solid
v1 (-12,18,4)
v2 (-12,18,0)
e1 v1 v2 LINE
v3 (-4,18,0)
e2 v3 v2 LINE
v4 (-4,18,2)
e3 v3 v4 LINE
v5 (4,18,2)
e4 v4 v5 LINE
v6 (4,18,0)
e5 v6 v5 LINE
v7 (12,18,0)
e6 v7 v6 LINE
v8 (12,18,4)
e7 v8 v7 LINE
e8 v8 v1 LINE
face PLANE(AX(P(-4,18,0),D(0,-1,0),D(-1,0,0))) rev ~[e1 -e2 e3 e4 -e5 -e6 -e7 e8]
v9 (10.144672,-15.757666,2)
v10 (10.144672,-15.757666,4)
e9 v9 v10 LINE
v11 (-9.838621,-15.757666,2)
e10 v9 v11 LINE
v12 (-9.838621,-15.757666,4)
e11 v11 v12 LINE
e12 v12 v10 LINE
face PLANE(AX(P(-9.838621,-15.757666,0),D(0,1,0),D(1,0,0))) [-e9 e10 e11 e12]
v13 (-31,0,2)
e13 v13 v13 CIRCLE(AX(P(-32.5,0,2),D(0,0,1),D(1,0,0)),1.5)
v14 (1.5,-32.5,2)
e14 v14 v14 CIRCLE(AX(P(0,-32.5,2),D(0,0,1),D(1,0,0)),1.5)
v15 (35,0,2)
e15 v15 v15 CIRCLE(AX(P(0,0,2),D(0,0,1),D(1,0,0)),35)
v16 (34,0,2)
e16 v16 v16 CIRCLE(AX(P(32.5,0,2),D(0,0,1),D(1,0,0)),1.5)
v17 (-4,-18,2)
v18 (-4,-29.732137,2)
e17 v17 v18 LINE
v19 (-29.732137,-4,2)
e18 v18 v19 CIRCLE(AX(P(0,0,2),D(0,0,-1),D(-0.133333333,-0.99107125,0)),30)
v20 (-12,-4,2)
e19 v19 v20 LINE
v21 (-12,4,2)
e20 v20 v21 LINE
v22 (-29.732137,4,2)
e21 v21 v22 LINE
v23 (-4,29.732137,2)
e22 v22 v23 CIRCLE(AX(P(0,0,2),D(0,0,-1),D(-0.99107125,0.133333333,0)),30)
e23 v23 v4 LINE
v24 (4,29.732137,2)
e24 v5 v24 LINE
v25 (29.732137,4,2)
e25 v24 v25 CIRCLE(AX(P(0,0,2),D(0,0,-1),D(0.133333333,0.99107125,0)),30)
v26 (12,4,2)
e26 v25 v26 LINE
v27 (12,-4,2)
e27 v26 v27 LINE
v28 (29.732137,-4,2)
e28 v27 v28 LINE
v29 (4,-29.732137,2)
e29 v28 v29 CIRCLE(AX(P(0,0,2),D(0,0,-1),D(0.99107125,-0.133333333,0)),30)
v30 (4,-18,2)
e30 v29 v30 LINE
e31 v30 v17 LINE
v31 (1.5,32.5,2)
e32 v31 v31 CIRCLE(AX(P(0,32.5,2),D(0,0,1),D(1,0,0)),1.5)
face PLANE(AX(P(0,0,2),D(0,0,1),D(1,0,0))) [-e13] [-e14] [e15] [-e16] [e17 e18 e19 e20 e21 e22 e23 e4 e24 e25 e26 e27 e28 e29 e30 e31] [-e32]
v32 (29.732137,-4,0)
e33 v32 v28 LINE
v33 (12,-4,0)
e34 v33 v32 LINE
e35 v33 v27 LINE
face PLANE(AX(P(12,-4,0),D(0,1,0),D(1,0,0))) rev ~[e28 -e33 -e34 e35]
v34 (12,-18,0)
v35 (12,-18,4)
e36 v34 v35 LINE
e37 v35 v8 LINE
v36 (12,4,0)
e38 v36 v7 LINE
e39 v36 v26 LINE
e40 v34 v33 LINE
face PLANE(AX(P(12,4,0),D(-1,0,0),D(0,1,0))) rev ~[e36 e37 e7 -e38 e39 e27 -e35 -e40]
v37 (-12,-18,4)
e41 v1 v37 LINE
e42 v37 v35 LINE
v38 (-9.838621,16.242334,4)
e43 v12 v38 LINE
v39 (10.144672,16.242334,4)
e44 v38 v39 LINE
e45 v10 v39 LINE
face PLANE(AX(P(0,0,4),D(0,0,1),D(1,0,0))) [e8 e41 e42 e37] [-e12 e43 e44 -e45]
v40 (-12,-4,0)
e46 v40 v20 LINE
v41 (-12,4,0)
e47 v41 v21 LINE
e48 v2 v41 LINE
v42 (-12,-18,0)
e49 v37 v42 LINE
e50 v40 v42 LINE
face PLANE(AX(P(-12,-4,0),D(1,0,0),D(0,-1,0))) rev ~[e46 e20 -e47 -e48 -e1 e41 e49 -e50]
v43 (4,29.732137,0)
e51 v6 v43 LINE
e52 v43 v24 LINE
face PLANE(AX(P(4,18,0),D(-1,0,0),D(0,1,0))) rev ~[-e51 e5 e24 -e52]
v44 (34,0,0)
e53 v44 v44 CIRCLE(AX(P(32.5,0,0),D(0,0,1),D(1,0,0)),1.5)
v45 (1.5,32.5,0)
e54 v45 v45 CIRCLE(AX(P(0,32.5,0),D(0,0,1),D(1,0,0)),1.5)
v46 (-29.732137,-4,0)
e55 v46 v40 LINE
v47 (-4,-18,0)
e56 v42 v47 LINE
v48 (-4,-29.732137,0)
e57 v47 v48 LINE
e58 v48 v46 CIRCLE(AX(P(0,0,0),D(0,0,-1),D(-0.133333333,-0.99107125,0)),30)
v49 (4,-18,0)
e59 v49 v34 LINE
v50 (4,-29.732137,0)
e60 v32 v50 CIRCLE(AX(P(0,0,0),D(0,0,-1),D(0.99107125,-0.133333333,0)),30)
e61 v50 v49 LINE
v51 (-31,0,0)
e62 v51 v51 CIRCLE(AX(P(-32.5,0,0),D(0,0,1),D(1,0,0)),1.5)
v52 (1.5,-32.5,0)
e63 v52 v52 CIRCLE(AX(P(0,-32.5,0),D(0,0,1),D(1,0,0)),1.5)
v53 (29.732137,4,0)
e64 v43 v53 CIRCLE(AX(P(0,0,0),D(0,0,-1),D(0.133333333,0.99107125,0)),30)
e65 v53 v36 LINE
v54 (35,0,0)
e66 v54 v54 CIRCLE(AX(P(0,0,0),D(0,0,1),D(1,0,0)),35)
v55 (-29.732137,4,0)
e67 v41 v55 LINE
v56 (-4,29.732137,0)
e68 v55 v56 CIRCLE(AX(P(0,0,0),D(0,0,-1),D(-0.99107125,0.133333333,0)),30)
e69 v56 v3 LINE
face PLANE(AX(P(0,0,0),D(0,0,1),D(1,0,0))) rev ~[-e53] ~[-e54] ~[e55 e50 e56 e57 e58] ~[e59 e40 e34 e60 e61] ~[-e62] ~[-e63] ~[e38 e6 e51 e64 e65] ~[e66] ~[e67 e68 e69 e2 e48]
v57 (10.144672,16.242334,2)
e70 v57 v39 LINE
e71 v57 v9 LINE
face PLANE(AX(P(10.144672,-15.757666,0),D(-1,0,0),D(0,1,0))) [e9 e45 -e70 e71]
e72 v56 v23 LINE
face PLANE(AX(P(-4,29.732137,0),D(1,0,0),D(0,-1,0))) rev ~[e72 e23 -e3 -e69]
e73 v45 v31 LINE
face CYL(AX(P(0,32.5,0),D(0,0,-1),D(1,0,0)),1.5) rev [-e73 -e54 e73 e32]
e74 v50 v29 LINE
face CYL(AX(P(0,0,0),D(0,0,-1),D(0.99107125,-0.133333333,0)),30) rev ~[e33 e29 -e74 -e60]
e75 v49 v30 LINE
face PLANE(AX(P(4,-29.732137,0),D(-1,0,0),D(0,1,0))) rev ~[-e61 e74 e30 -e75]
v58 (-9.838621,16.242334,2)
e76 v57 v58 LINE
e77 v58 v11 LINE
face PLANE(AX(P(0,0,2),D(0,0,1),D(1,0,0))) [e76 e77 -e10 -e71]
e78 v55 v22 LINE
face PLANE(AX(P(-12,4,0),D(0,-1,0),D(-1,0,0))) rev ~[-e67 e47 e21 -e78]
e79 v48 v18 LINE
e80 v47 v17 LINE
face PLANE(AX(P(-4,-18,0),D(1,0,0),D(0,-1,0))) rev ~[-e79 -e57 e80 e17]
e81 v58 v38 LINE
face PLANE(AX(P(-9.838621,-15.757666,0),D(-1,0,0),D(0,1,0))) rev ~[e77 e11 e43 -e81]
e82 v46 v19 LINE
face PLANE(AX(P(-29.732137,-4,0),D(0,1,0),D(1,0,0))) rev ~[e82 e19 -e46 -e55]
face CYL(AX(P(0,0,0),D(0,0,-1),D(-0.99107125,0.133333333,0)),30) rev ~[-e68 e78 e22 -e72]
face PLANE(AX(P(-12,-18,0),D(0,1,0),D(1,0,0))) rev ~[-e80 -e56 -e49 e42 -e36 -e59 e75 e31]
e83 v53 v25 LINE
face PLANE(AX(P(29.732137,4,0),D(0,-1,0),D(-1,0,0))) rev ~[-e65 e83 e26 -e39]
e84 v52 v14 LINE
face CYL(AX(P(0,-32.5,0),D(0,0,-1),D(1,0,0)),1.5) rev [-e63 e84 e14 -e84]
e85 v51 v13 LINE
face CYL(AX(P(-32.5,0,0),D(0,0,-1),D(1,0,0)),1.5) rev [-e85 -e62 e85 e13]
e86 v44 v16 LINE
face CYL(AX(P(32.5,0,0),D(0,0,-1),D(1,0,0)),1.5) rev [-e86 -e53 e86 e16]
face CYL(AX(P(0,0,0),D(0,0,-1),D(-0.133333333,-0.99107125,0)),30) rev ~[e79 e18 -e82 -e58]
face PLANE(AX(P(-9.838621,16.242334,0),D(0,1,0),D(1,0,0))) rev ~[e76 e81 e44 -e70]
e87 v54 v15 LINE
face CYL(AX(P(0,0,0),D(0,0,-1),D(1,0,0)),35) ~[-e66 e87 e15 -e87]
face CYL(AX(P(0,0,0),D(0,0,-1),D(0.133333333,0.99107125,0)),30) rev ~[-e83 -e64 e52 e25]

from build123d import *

# Parameters (mm, degrees)
F0_R     = 35
F0_R_2   = 1.5
F0_W     = 19.983293198
F0_H     = 32
F1_DEPTH = 2
F2_DEPTH = 4


# Not quite as in the source:
# - a feature names something its author has since deleted; it is built from what else it names


with BuildPart() as f1:
    # F0 (on Top) → F1 (new body)
    with BuildSketch(Plane.XY):
        Circle(F0_R)
        with Locations((0, -32.5)):
            Circle(F0_R_2, mode=Mode.SUBTRACT)
        with Locations((-32.5, 0)):
            Circle(F0_R_2, mode=Mode.SUBTRACT)
        with BuildLine():
            ThreePointArc((29.7321374946, 4), (29.9329594664, 2.0044793789), (30, 0))
            ThreePointArc((30, 0), (29.9329594664, -2.0044793789), (29.7321374946, -4))
            ThreePointArc((29.7321374946, -4), (21.2132034356, -21.2132034356), (4, -29.7321374946))
            ThreePointArc((4, -29.7321374946), (0, -30), (-4, -29.7321374946))
            ThreePointArc((-4, -29.7321374946), (-21.2132034356, -21.2132034356), (-29.7321374946, -4))
            ThreePointArc((-29.7321374946, -4), (-30, 0), (-29.7321374946, 4))
            ThreePointArc((-29.7321374946, 4), (-21.2132034356, 21.2132034356), (-4, 29.7321374946))
            ThreePointArc((-4, 29.7321374946), (0, 30), (4, 29.7321374946))
            ThreePointArc((4, 29.7321374946), (21.2132034356, 21.2132034356), (29.7321374946, 4))
        make_face(mode=Mode.SUBTRACT)
        with Locations((32.5, 0)):
            Circle(F0_R_2, mode=Mode.SUBTRACT)
        with Locations((0, 32.5)):
            Circle(F0_R_2, mode=Mode.SUBTRACT)
        with BuildLine():
            Line((4, 18), (4, 29.7321374946))
            ThreePointArc((4, 29.7321374946), (0, 30), (-4, 29.7321374946))
            Line((-4, 29.7321374946), (-4, 18))
            Line((-4, 18), (4, 18))
        make_face()
        with BuildLine():
            Line((-12, 4), (-29.7321374946, 4))
            ThreePointArc((-29.7321374946, 4), (-30, 0), (-29.7321374946, -4))
            Line((-29.7321374946, -4), (-12, -4))
            Line((-12, -4), (-12, 4))
        make_face()
        with BuildLine():
            ThreePointArc((-4, -29.7321374946), (0, -30), (4, -29.7321374946))
            Line((4, -29.7321374946), (4, -18))
            Line((4, -18), (-4, -18))
            Line((-4, -18), (-4, -29.7321374946))
        make_face()
        Polygon((12, -4), (12, 4), (12, 12.1005004627), (12, 18), (4, 18), (-4, 18), (-12, 18), (-12, 4), (-12, -4), (-12, -18), (-4, -18), (4, -18), (12, -18), (12, -5.151443038), align=None)
        with Locations((0.1530251862, 0.242334145)):
            Rectangle(F0_W, F0_H, mode=Mode.SUBTRACT)
        with Locations((0.1530251862, 0.242334145)):
            Rectangle(F0_W, F0_H)
        with BuildLine():
            ThreePointArc((29.7321374946, -4), (29.9329594664, -2.0044793789), (30, 0))
            ThreePointArc((30, 0), (29.9329594664, 2.0044793789), (29.7321374946, 4))
            Line((29.7321374946, 4), (12, 4))
            Line((12, 4), (12, -4))
            Line((12, -4), (29.7321374946, -4))
        make_face()
    extrude(amount=F1_DEPTH)

    # F0 (on Top) → F2 (join)
    with BuildSketch(Plane.XY):
        Polygon((12, -4), (12, 4), (12, 12.1005004627), (12, 18), (4, 18), (-4, 18), (-12, 18), (-12, 4), (-12, -4), (-12, -18), (-4, -18), (4, -18), (12, -18), (12, -5.151443038), align=None)
        with Locations((0.1530251862, 0.242334145)):
            Rectangle(F0_W, F0_H, mode=Mode.SUBTRACT)
    extrude(amount=F2_DEPTH)


solid = f1.part
